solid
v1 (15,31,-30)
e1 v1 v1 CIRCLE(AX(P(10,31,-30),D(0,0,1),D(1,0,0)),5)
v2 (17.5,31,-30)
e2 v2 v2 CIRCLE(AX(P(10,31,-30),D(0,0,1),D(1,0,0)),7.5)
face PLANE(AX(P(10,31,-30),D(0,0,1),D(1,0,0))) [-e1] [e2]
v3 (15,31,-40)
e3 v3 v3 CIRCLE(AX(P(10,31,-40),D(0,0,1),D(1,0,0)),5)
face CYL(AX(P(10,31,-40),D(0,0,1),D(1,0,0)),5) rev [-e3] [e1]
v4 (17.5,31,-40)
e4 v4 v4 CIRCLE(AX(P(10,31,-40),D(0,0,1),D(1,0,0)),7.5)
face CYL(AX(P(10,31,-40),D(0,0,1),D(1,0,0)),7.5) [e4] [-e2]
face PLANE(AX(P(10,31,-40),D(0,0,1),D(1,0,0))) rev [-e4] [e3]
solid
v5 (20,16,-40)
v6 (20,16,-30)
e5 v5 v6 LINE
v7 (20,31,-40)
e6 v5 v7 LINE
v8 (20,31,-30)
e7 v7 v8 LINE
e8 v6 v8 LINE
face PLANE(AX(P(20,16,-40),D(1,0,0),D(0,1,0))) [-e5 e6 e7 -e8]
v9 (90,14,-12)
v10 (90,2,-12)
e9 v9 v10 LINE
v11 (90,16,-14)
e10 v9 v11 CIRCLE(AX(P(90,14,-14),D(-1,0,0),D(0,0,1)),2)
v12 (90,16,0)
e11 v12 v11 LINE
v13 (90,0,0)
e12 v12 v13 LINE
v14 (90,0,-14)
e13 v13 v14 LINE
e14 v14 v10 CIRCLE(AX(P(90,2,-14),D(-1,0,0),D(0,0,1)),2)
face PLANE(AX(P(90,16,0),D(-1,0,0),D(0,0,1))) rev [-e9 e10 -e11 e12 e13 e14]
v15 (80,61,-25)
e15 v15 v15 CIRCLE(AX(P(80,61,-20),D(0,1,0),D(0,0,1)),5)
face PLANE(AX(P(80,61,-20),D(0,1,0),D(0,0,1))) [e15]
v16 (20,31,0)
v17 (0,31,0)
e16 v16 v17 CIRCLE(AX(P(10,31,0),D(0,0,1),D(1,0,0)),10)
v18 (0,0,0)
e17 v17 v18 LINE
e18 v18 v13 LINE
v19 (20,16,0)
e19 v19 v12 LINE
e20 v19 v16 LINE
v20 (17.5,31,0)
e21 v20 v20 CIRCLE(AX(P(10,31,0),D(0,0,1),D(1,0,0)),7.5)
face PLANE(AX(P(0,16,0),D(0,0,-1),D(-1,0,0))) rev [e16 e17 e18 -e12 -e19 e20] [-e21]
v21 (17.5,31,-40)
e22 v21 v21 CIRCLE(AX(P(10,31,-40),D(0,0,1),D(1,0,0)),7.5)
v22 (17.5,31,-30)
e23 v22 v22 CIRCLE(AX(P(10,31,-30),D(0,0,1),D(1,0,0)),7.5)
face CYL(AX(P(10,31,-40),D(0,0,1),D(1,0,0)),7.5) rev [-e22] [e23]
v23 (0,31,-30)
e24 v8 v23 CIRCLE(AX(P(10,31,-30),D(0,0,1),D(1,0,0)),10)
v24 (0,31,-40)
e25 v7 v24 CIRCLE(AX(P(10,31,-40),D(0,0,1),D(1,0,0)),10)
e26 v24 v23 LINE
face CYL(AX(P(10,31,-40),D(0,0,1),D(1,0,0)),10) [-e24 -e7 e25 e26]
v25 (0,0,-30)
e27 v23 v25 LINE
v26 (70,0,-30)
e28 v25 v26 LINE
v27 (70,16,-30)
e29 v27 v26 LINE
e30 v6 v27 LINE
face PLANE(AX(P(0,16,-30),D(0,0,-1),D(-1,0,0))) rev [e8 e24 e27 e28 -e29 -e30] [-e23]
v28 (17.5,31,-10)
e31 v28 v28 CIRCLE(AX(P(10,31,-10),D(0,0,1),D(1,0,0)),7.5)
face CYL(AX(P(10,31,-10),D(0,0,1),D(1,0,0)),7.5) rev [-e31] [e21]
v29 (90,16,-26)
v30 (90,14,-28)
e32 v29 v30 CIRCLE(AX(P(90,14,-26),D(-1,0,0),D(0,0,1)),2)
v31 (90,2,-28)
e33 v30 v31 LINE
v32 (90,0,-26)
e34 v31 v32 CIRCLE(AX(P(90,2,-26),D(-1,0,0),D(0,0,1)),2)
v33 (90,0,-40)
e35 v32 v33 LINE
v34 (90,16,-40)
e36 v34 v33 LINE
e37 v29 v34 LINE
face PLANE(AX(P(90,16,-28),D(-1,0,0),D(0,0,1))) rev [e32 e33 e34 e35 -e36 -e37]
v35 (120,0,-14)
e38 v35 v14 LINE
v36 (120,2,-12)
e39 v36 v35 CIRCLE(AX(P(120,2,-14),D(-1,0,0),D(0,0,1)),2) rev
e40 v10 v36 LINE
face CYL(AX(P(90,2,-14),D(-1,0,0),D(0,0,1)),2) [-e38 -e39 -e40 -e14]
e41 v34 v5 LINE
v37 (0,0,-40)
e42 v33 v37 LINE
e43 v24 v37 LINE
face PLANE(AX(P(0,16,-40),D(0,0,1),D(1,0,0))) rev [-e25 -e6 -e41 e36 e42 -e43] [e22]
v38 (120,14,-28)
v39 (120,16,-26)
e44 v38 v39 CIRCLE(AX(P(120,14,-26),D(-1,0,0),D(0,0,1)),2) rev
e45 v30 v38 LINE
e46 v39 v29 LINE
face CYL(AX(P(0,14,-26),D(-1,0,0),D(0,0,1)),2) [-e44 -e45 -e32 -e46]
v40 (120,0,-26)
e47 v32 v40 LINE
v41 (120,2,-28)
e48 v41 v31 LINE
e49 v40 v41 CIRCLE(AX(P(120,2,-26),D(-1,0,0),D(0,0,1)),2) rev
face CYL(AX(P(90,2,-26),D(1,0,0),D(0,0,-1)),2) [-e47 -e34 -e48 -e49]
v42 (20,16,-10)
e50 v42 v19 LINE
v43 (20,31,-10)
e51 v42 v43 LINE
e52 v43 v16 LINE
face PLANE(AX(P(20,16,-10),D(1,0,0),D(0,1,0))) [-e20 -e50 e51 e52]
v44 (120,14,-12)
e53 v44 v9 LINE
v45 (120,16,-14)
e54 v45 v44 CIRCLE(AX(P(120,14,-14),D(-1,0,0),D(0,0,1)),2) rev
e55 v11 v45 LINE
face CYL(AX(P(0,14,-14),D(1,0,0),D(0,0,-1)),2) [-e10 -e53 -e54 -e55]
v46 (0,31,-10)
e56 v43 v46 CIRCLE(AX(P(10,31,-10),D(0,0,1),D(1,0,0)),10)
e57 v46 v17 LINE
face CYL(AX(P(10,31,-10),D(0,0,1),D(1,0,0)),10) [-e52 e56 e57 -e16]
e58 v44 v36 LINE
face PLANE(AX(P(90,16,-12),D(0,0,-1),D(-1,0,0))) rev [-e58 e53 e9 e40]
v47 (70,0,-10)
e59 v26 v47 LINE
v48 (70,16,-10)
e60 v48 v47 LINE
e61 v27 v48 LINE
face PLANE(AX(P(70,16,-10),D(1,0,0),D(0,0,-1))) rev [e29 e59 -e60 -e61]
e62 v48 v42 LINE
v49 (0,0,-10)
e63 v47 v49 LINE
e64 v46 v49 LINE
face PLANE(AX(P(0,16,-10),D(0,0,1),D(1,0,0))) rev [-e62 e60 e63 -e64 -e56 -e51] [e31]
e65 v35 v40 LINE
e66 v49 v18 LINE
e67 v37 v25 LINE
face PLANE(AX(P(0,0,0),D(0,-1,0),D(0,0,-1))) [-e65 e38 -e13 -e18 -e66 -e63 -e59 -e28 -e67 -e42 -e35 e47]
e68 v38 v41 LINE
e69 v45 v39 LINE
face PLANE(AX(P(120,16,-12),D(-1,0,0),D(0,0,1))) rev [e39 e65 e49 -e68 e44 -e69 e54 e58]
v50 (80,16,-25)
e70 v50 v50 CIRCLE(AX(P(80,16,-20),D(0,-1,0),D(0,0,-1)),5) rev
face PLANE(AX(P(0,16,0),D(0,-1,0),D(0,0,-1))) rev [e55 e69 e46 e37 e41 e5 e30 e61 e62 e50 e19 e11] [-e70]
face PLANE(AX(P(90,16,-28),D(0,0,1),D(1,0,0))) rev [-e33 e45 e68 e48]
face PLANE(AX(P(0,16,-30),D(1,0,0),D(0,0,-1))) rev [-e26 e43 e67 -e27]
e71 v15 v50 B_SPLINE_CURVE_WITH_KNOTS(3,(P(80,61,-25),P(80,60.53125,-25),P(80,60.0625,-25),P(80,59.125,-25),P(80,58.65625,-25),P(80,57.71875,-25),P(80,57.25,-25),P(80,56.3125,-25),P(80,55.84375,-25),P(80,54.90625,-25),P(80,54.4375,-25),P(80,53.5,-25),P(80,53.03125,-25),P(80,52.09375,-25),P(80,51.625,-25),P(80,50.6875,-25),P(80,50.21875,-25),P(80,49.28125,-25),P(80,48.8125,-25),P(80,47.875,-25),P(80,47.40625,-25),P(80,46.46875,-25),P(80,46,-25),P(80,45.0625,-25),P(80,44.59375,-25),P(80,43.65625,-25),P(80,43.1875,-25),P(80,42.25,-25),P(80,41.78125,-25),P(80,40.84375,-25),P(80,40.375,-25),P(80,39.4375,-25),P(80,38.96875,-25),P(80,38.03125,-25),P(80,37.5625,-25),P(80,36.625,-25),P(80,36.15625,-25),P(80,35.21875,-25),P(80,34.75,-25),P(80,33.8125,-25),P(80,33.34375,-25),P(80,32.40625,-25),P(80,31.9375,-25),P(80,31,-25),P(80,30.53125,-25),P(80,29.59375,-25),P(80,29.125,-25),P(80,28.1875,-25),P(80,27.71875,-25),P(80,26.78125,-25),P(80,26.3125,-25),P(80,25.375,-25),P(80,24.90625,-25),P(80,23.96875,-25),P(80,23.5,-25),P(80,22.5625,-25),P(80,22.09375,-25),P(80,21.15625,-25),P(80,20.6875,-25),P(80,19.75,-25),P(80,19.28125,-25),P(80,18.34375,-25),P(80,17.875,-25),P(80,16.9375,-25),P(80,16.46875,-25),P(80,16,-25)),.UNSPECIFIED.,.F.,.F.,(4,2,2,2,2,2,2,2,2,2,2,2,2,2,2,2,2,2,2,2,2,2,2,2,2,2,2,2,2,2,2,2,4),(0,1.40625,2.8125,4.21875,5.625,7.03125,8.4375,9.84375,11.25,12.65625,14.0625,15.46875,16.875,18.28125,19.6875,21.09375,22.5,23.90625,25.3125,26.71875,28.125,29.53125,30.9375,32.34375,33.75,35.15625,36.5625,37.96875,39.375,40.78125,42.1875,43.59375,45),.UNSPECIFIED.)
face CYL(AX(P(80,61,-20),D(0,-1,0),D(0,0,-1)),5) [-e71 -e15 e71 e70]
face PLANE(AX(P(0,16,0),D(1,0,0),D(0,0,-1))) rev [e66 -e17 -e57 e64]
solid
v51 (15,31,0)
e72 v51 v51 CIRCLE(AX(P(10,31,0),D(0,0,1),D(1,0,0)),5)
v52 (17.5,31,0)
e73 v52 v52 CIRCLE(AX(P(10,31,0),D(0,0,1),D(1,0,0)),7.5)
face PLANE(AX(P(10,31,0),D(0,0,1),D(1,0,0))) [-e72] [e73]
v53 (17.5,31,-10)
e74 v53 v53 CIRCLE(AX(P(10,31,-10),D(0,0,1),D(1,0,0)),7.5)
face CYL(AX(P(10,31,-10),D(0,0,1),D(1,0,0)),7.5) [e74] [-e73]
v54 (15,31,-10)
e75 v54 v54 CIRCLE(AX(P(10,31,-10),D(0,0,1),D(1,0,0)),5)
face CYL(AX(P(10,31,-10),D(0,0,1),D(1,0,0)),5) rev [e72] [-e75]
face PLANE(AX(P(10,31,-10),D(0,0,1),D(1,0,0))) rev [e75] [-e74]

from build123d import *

# Parameters (mm, degrees)
BOSS_EXTRUDE1_DEPTH   = 16
FILLET1_R             = 2
SKETCH3_R             = 7.5
BOSS_EXTRUDE2_DEPTH   = 10
SKETCH4_R             = 5
BOSS_EXTRUDE3_DEPTH   = 45
SKETCH5_R             = 7.5
SKETCH5_R_2           = 5
BOSS_EXTRUDE4_DEPTH   = 10
LPATTERN1_START       = -40
LPATTERN1_OUTLINE_R   = 7.5
LPATTERN1_OUTLINE_R_2 = 5
LPATTERN1_DEPTH       = 10
LPATTERN1_2_OUTLINE_R = 7.5
LPATTERN1_2_DEPTH     = 10


# Read off the part's stored shape, not the designer's step: LPattern1
with BuildPart() as part:
    # Sketch2 → Boss-Extrude1 (new body)
    with BuildSketch(Plane(origin=(0, 0, 0), x_dir=(1, 0, 0), z_dir=(0, 1, 0))):
        Polygon((0, 30), (0, 40), (90, 40), (90, 28), (120, 28), (120, 12), (90, 12), (90, 0), (0, 0), (0, 10), (70, 10), (70, 30), align=None)
    extrude(amount=BOSS_EXTRUDE1_DEPTH)

    # Fillet1
    fillet1_edges = [part.edges().sort_by_distance(p)[0] for p in [
        (105, 16, -12),
        (105, 0, -28),
        (105, 0, -12),
        (105, 16, -28),
    ]]
    fillet(fillet1_edges, radius=FILLET1_R)

    # Sketch3 → Boss-Extrude2 (add)
    with BuildSketch(Plane.XY):
        with BuildLine():
            Line((0, 16), (20, 16))
            Line((20, 16), (20, 31))
            ThreePointArc((20, 31), (10, 41), (0, 31))
            Line((0, 31), (0, 16))
        make_face()
        with Locations((10, 31)):
            Circle(SKETCH3_R, mode=Mode.SUBTRACT)
    extrude(amount=-BOSS_EXTRUDE2_DEPTH)

    # Sketch4 → Boss-Extrude3 (add)
    with BuildSketch(Plane(origin=(0, 16, 0), x_dir=(1, 0, 0), z_dir=(0, 1, 0))):
        with Locations(Location((80, 20, 0), (0, 0, 90))):
            Circle(SKETCH4_R)
    extrude(amount=BOSS_EXTRUDE3_DEPTH)

    # LPattern1 2 outline → LPattern1 2 (add)
    with BuildSketch(Plane.XY.offset(LPATTERN1_START)):
        with BuildLine():
            Line((0, 31), (0, 16))
            Line((0, 16), (20, 16))
            Line((20, 16), (20, 31))
            ThreePointArc((20, 31), (10, 41), (0, 31))
        make_face()
        with Locations((10, 31)):
            Circle(LPATTERN1_2_OUTLINE_R, mode=Mode.SUBTRACT)
    extrude(amount=LPATTERN1_2_DEPTH)


with BuildPart() as body_2:
    # Sketch5 → Boss-Extrude4 (new body)
    with BuildSketch(Plane.XY):
        with Locations((10, 31)):
            Circle(SKETCH5_R)
        with Locations((10, 31)):
            Circle(SKETCH5_R_2, mode=Mode.SUBTRACT)
    extrude(amount=-BOSS_EXTRUDE4_DEPTH)


with BuildPart() as body_3:
    # LPattern1 outline → LPattern1 (new body)
    with BuildSketch(Plane.XY.offset(LPATTERN1_START)):
        with Locations((10, 31)):
            Circle(LPATTERN1_OUTLINE_R)
        with Locations((10, 31)):
            Circle(LPATTERN1_OUTLINE_R_2, mode=Mode.SUBTRACT)
    extrude(amount=LPATTERN1_DEPTH)


solid = Compound([part.part, body_2.part, body_3.part])
